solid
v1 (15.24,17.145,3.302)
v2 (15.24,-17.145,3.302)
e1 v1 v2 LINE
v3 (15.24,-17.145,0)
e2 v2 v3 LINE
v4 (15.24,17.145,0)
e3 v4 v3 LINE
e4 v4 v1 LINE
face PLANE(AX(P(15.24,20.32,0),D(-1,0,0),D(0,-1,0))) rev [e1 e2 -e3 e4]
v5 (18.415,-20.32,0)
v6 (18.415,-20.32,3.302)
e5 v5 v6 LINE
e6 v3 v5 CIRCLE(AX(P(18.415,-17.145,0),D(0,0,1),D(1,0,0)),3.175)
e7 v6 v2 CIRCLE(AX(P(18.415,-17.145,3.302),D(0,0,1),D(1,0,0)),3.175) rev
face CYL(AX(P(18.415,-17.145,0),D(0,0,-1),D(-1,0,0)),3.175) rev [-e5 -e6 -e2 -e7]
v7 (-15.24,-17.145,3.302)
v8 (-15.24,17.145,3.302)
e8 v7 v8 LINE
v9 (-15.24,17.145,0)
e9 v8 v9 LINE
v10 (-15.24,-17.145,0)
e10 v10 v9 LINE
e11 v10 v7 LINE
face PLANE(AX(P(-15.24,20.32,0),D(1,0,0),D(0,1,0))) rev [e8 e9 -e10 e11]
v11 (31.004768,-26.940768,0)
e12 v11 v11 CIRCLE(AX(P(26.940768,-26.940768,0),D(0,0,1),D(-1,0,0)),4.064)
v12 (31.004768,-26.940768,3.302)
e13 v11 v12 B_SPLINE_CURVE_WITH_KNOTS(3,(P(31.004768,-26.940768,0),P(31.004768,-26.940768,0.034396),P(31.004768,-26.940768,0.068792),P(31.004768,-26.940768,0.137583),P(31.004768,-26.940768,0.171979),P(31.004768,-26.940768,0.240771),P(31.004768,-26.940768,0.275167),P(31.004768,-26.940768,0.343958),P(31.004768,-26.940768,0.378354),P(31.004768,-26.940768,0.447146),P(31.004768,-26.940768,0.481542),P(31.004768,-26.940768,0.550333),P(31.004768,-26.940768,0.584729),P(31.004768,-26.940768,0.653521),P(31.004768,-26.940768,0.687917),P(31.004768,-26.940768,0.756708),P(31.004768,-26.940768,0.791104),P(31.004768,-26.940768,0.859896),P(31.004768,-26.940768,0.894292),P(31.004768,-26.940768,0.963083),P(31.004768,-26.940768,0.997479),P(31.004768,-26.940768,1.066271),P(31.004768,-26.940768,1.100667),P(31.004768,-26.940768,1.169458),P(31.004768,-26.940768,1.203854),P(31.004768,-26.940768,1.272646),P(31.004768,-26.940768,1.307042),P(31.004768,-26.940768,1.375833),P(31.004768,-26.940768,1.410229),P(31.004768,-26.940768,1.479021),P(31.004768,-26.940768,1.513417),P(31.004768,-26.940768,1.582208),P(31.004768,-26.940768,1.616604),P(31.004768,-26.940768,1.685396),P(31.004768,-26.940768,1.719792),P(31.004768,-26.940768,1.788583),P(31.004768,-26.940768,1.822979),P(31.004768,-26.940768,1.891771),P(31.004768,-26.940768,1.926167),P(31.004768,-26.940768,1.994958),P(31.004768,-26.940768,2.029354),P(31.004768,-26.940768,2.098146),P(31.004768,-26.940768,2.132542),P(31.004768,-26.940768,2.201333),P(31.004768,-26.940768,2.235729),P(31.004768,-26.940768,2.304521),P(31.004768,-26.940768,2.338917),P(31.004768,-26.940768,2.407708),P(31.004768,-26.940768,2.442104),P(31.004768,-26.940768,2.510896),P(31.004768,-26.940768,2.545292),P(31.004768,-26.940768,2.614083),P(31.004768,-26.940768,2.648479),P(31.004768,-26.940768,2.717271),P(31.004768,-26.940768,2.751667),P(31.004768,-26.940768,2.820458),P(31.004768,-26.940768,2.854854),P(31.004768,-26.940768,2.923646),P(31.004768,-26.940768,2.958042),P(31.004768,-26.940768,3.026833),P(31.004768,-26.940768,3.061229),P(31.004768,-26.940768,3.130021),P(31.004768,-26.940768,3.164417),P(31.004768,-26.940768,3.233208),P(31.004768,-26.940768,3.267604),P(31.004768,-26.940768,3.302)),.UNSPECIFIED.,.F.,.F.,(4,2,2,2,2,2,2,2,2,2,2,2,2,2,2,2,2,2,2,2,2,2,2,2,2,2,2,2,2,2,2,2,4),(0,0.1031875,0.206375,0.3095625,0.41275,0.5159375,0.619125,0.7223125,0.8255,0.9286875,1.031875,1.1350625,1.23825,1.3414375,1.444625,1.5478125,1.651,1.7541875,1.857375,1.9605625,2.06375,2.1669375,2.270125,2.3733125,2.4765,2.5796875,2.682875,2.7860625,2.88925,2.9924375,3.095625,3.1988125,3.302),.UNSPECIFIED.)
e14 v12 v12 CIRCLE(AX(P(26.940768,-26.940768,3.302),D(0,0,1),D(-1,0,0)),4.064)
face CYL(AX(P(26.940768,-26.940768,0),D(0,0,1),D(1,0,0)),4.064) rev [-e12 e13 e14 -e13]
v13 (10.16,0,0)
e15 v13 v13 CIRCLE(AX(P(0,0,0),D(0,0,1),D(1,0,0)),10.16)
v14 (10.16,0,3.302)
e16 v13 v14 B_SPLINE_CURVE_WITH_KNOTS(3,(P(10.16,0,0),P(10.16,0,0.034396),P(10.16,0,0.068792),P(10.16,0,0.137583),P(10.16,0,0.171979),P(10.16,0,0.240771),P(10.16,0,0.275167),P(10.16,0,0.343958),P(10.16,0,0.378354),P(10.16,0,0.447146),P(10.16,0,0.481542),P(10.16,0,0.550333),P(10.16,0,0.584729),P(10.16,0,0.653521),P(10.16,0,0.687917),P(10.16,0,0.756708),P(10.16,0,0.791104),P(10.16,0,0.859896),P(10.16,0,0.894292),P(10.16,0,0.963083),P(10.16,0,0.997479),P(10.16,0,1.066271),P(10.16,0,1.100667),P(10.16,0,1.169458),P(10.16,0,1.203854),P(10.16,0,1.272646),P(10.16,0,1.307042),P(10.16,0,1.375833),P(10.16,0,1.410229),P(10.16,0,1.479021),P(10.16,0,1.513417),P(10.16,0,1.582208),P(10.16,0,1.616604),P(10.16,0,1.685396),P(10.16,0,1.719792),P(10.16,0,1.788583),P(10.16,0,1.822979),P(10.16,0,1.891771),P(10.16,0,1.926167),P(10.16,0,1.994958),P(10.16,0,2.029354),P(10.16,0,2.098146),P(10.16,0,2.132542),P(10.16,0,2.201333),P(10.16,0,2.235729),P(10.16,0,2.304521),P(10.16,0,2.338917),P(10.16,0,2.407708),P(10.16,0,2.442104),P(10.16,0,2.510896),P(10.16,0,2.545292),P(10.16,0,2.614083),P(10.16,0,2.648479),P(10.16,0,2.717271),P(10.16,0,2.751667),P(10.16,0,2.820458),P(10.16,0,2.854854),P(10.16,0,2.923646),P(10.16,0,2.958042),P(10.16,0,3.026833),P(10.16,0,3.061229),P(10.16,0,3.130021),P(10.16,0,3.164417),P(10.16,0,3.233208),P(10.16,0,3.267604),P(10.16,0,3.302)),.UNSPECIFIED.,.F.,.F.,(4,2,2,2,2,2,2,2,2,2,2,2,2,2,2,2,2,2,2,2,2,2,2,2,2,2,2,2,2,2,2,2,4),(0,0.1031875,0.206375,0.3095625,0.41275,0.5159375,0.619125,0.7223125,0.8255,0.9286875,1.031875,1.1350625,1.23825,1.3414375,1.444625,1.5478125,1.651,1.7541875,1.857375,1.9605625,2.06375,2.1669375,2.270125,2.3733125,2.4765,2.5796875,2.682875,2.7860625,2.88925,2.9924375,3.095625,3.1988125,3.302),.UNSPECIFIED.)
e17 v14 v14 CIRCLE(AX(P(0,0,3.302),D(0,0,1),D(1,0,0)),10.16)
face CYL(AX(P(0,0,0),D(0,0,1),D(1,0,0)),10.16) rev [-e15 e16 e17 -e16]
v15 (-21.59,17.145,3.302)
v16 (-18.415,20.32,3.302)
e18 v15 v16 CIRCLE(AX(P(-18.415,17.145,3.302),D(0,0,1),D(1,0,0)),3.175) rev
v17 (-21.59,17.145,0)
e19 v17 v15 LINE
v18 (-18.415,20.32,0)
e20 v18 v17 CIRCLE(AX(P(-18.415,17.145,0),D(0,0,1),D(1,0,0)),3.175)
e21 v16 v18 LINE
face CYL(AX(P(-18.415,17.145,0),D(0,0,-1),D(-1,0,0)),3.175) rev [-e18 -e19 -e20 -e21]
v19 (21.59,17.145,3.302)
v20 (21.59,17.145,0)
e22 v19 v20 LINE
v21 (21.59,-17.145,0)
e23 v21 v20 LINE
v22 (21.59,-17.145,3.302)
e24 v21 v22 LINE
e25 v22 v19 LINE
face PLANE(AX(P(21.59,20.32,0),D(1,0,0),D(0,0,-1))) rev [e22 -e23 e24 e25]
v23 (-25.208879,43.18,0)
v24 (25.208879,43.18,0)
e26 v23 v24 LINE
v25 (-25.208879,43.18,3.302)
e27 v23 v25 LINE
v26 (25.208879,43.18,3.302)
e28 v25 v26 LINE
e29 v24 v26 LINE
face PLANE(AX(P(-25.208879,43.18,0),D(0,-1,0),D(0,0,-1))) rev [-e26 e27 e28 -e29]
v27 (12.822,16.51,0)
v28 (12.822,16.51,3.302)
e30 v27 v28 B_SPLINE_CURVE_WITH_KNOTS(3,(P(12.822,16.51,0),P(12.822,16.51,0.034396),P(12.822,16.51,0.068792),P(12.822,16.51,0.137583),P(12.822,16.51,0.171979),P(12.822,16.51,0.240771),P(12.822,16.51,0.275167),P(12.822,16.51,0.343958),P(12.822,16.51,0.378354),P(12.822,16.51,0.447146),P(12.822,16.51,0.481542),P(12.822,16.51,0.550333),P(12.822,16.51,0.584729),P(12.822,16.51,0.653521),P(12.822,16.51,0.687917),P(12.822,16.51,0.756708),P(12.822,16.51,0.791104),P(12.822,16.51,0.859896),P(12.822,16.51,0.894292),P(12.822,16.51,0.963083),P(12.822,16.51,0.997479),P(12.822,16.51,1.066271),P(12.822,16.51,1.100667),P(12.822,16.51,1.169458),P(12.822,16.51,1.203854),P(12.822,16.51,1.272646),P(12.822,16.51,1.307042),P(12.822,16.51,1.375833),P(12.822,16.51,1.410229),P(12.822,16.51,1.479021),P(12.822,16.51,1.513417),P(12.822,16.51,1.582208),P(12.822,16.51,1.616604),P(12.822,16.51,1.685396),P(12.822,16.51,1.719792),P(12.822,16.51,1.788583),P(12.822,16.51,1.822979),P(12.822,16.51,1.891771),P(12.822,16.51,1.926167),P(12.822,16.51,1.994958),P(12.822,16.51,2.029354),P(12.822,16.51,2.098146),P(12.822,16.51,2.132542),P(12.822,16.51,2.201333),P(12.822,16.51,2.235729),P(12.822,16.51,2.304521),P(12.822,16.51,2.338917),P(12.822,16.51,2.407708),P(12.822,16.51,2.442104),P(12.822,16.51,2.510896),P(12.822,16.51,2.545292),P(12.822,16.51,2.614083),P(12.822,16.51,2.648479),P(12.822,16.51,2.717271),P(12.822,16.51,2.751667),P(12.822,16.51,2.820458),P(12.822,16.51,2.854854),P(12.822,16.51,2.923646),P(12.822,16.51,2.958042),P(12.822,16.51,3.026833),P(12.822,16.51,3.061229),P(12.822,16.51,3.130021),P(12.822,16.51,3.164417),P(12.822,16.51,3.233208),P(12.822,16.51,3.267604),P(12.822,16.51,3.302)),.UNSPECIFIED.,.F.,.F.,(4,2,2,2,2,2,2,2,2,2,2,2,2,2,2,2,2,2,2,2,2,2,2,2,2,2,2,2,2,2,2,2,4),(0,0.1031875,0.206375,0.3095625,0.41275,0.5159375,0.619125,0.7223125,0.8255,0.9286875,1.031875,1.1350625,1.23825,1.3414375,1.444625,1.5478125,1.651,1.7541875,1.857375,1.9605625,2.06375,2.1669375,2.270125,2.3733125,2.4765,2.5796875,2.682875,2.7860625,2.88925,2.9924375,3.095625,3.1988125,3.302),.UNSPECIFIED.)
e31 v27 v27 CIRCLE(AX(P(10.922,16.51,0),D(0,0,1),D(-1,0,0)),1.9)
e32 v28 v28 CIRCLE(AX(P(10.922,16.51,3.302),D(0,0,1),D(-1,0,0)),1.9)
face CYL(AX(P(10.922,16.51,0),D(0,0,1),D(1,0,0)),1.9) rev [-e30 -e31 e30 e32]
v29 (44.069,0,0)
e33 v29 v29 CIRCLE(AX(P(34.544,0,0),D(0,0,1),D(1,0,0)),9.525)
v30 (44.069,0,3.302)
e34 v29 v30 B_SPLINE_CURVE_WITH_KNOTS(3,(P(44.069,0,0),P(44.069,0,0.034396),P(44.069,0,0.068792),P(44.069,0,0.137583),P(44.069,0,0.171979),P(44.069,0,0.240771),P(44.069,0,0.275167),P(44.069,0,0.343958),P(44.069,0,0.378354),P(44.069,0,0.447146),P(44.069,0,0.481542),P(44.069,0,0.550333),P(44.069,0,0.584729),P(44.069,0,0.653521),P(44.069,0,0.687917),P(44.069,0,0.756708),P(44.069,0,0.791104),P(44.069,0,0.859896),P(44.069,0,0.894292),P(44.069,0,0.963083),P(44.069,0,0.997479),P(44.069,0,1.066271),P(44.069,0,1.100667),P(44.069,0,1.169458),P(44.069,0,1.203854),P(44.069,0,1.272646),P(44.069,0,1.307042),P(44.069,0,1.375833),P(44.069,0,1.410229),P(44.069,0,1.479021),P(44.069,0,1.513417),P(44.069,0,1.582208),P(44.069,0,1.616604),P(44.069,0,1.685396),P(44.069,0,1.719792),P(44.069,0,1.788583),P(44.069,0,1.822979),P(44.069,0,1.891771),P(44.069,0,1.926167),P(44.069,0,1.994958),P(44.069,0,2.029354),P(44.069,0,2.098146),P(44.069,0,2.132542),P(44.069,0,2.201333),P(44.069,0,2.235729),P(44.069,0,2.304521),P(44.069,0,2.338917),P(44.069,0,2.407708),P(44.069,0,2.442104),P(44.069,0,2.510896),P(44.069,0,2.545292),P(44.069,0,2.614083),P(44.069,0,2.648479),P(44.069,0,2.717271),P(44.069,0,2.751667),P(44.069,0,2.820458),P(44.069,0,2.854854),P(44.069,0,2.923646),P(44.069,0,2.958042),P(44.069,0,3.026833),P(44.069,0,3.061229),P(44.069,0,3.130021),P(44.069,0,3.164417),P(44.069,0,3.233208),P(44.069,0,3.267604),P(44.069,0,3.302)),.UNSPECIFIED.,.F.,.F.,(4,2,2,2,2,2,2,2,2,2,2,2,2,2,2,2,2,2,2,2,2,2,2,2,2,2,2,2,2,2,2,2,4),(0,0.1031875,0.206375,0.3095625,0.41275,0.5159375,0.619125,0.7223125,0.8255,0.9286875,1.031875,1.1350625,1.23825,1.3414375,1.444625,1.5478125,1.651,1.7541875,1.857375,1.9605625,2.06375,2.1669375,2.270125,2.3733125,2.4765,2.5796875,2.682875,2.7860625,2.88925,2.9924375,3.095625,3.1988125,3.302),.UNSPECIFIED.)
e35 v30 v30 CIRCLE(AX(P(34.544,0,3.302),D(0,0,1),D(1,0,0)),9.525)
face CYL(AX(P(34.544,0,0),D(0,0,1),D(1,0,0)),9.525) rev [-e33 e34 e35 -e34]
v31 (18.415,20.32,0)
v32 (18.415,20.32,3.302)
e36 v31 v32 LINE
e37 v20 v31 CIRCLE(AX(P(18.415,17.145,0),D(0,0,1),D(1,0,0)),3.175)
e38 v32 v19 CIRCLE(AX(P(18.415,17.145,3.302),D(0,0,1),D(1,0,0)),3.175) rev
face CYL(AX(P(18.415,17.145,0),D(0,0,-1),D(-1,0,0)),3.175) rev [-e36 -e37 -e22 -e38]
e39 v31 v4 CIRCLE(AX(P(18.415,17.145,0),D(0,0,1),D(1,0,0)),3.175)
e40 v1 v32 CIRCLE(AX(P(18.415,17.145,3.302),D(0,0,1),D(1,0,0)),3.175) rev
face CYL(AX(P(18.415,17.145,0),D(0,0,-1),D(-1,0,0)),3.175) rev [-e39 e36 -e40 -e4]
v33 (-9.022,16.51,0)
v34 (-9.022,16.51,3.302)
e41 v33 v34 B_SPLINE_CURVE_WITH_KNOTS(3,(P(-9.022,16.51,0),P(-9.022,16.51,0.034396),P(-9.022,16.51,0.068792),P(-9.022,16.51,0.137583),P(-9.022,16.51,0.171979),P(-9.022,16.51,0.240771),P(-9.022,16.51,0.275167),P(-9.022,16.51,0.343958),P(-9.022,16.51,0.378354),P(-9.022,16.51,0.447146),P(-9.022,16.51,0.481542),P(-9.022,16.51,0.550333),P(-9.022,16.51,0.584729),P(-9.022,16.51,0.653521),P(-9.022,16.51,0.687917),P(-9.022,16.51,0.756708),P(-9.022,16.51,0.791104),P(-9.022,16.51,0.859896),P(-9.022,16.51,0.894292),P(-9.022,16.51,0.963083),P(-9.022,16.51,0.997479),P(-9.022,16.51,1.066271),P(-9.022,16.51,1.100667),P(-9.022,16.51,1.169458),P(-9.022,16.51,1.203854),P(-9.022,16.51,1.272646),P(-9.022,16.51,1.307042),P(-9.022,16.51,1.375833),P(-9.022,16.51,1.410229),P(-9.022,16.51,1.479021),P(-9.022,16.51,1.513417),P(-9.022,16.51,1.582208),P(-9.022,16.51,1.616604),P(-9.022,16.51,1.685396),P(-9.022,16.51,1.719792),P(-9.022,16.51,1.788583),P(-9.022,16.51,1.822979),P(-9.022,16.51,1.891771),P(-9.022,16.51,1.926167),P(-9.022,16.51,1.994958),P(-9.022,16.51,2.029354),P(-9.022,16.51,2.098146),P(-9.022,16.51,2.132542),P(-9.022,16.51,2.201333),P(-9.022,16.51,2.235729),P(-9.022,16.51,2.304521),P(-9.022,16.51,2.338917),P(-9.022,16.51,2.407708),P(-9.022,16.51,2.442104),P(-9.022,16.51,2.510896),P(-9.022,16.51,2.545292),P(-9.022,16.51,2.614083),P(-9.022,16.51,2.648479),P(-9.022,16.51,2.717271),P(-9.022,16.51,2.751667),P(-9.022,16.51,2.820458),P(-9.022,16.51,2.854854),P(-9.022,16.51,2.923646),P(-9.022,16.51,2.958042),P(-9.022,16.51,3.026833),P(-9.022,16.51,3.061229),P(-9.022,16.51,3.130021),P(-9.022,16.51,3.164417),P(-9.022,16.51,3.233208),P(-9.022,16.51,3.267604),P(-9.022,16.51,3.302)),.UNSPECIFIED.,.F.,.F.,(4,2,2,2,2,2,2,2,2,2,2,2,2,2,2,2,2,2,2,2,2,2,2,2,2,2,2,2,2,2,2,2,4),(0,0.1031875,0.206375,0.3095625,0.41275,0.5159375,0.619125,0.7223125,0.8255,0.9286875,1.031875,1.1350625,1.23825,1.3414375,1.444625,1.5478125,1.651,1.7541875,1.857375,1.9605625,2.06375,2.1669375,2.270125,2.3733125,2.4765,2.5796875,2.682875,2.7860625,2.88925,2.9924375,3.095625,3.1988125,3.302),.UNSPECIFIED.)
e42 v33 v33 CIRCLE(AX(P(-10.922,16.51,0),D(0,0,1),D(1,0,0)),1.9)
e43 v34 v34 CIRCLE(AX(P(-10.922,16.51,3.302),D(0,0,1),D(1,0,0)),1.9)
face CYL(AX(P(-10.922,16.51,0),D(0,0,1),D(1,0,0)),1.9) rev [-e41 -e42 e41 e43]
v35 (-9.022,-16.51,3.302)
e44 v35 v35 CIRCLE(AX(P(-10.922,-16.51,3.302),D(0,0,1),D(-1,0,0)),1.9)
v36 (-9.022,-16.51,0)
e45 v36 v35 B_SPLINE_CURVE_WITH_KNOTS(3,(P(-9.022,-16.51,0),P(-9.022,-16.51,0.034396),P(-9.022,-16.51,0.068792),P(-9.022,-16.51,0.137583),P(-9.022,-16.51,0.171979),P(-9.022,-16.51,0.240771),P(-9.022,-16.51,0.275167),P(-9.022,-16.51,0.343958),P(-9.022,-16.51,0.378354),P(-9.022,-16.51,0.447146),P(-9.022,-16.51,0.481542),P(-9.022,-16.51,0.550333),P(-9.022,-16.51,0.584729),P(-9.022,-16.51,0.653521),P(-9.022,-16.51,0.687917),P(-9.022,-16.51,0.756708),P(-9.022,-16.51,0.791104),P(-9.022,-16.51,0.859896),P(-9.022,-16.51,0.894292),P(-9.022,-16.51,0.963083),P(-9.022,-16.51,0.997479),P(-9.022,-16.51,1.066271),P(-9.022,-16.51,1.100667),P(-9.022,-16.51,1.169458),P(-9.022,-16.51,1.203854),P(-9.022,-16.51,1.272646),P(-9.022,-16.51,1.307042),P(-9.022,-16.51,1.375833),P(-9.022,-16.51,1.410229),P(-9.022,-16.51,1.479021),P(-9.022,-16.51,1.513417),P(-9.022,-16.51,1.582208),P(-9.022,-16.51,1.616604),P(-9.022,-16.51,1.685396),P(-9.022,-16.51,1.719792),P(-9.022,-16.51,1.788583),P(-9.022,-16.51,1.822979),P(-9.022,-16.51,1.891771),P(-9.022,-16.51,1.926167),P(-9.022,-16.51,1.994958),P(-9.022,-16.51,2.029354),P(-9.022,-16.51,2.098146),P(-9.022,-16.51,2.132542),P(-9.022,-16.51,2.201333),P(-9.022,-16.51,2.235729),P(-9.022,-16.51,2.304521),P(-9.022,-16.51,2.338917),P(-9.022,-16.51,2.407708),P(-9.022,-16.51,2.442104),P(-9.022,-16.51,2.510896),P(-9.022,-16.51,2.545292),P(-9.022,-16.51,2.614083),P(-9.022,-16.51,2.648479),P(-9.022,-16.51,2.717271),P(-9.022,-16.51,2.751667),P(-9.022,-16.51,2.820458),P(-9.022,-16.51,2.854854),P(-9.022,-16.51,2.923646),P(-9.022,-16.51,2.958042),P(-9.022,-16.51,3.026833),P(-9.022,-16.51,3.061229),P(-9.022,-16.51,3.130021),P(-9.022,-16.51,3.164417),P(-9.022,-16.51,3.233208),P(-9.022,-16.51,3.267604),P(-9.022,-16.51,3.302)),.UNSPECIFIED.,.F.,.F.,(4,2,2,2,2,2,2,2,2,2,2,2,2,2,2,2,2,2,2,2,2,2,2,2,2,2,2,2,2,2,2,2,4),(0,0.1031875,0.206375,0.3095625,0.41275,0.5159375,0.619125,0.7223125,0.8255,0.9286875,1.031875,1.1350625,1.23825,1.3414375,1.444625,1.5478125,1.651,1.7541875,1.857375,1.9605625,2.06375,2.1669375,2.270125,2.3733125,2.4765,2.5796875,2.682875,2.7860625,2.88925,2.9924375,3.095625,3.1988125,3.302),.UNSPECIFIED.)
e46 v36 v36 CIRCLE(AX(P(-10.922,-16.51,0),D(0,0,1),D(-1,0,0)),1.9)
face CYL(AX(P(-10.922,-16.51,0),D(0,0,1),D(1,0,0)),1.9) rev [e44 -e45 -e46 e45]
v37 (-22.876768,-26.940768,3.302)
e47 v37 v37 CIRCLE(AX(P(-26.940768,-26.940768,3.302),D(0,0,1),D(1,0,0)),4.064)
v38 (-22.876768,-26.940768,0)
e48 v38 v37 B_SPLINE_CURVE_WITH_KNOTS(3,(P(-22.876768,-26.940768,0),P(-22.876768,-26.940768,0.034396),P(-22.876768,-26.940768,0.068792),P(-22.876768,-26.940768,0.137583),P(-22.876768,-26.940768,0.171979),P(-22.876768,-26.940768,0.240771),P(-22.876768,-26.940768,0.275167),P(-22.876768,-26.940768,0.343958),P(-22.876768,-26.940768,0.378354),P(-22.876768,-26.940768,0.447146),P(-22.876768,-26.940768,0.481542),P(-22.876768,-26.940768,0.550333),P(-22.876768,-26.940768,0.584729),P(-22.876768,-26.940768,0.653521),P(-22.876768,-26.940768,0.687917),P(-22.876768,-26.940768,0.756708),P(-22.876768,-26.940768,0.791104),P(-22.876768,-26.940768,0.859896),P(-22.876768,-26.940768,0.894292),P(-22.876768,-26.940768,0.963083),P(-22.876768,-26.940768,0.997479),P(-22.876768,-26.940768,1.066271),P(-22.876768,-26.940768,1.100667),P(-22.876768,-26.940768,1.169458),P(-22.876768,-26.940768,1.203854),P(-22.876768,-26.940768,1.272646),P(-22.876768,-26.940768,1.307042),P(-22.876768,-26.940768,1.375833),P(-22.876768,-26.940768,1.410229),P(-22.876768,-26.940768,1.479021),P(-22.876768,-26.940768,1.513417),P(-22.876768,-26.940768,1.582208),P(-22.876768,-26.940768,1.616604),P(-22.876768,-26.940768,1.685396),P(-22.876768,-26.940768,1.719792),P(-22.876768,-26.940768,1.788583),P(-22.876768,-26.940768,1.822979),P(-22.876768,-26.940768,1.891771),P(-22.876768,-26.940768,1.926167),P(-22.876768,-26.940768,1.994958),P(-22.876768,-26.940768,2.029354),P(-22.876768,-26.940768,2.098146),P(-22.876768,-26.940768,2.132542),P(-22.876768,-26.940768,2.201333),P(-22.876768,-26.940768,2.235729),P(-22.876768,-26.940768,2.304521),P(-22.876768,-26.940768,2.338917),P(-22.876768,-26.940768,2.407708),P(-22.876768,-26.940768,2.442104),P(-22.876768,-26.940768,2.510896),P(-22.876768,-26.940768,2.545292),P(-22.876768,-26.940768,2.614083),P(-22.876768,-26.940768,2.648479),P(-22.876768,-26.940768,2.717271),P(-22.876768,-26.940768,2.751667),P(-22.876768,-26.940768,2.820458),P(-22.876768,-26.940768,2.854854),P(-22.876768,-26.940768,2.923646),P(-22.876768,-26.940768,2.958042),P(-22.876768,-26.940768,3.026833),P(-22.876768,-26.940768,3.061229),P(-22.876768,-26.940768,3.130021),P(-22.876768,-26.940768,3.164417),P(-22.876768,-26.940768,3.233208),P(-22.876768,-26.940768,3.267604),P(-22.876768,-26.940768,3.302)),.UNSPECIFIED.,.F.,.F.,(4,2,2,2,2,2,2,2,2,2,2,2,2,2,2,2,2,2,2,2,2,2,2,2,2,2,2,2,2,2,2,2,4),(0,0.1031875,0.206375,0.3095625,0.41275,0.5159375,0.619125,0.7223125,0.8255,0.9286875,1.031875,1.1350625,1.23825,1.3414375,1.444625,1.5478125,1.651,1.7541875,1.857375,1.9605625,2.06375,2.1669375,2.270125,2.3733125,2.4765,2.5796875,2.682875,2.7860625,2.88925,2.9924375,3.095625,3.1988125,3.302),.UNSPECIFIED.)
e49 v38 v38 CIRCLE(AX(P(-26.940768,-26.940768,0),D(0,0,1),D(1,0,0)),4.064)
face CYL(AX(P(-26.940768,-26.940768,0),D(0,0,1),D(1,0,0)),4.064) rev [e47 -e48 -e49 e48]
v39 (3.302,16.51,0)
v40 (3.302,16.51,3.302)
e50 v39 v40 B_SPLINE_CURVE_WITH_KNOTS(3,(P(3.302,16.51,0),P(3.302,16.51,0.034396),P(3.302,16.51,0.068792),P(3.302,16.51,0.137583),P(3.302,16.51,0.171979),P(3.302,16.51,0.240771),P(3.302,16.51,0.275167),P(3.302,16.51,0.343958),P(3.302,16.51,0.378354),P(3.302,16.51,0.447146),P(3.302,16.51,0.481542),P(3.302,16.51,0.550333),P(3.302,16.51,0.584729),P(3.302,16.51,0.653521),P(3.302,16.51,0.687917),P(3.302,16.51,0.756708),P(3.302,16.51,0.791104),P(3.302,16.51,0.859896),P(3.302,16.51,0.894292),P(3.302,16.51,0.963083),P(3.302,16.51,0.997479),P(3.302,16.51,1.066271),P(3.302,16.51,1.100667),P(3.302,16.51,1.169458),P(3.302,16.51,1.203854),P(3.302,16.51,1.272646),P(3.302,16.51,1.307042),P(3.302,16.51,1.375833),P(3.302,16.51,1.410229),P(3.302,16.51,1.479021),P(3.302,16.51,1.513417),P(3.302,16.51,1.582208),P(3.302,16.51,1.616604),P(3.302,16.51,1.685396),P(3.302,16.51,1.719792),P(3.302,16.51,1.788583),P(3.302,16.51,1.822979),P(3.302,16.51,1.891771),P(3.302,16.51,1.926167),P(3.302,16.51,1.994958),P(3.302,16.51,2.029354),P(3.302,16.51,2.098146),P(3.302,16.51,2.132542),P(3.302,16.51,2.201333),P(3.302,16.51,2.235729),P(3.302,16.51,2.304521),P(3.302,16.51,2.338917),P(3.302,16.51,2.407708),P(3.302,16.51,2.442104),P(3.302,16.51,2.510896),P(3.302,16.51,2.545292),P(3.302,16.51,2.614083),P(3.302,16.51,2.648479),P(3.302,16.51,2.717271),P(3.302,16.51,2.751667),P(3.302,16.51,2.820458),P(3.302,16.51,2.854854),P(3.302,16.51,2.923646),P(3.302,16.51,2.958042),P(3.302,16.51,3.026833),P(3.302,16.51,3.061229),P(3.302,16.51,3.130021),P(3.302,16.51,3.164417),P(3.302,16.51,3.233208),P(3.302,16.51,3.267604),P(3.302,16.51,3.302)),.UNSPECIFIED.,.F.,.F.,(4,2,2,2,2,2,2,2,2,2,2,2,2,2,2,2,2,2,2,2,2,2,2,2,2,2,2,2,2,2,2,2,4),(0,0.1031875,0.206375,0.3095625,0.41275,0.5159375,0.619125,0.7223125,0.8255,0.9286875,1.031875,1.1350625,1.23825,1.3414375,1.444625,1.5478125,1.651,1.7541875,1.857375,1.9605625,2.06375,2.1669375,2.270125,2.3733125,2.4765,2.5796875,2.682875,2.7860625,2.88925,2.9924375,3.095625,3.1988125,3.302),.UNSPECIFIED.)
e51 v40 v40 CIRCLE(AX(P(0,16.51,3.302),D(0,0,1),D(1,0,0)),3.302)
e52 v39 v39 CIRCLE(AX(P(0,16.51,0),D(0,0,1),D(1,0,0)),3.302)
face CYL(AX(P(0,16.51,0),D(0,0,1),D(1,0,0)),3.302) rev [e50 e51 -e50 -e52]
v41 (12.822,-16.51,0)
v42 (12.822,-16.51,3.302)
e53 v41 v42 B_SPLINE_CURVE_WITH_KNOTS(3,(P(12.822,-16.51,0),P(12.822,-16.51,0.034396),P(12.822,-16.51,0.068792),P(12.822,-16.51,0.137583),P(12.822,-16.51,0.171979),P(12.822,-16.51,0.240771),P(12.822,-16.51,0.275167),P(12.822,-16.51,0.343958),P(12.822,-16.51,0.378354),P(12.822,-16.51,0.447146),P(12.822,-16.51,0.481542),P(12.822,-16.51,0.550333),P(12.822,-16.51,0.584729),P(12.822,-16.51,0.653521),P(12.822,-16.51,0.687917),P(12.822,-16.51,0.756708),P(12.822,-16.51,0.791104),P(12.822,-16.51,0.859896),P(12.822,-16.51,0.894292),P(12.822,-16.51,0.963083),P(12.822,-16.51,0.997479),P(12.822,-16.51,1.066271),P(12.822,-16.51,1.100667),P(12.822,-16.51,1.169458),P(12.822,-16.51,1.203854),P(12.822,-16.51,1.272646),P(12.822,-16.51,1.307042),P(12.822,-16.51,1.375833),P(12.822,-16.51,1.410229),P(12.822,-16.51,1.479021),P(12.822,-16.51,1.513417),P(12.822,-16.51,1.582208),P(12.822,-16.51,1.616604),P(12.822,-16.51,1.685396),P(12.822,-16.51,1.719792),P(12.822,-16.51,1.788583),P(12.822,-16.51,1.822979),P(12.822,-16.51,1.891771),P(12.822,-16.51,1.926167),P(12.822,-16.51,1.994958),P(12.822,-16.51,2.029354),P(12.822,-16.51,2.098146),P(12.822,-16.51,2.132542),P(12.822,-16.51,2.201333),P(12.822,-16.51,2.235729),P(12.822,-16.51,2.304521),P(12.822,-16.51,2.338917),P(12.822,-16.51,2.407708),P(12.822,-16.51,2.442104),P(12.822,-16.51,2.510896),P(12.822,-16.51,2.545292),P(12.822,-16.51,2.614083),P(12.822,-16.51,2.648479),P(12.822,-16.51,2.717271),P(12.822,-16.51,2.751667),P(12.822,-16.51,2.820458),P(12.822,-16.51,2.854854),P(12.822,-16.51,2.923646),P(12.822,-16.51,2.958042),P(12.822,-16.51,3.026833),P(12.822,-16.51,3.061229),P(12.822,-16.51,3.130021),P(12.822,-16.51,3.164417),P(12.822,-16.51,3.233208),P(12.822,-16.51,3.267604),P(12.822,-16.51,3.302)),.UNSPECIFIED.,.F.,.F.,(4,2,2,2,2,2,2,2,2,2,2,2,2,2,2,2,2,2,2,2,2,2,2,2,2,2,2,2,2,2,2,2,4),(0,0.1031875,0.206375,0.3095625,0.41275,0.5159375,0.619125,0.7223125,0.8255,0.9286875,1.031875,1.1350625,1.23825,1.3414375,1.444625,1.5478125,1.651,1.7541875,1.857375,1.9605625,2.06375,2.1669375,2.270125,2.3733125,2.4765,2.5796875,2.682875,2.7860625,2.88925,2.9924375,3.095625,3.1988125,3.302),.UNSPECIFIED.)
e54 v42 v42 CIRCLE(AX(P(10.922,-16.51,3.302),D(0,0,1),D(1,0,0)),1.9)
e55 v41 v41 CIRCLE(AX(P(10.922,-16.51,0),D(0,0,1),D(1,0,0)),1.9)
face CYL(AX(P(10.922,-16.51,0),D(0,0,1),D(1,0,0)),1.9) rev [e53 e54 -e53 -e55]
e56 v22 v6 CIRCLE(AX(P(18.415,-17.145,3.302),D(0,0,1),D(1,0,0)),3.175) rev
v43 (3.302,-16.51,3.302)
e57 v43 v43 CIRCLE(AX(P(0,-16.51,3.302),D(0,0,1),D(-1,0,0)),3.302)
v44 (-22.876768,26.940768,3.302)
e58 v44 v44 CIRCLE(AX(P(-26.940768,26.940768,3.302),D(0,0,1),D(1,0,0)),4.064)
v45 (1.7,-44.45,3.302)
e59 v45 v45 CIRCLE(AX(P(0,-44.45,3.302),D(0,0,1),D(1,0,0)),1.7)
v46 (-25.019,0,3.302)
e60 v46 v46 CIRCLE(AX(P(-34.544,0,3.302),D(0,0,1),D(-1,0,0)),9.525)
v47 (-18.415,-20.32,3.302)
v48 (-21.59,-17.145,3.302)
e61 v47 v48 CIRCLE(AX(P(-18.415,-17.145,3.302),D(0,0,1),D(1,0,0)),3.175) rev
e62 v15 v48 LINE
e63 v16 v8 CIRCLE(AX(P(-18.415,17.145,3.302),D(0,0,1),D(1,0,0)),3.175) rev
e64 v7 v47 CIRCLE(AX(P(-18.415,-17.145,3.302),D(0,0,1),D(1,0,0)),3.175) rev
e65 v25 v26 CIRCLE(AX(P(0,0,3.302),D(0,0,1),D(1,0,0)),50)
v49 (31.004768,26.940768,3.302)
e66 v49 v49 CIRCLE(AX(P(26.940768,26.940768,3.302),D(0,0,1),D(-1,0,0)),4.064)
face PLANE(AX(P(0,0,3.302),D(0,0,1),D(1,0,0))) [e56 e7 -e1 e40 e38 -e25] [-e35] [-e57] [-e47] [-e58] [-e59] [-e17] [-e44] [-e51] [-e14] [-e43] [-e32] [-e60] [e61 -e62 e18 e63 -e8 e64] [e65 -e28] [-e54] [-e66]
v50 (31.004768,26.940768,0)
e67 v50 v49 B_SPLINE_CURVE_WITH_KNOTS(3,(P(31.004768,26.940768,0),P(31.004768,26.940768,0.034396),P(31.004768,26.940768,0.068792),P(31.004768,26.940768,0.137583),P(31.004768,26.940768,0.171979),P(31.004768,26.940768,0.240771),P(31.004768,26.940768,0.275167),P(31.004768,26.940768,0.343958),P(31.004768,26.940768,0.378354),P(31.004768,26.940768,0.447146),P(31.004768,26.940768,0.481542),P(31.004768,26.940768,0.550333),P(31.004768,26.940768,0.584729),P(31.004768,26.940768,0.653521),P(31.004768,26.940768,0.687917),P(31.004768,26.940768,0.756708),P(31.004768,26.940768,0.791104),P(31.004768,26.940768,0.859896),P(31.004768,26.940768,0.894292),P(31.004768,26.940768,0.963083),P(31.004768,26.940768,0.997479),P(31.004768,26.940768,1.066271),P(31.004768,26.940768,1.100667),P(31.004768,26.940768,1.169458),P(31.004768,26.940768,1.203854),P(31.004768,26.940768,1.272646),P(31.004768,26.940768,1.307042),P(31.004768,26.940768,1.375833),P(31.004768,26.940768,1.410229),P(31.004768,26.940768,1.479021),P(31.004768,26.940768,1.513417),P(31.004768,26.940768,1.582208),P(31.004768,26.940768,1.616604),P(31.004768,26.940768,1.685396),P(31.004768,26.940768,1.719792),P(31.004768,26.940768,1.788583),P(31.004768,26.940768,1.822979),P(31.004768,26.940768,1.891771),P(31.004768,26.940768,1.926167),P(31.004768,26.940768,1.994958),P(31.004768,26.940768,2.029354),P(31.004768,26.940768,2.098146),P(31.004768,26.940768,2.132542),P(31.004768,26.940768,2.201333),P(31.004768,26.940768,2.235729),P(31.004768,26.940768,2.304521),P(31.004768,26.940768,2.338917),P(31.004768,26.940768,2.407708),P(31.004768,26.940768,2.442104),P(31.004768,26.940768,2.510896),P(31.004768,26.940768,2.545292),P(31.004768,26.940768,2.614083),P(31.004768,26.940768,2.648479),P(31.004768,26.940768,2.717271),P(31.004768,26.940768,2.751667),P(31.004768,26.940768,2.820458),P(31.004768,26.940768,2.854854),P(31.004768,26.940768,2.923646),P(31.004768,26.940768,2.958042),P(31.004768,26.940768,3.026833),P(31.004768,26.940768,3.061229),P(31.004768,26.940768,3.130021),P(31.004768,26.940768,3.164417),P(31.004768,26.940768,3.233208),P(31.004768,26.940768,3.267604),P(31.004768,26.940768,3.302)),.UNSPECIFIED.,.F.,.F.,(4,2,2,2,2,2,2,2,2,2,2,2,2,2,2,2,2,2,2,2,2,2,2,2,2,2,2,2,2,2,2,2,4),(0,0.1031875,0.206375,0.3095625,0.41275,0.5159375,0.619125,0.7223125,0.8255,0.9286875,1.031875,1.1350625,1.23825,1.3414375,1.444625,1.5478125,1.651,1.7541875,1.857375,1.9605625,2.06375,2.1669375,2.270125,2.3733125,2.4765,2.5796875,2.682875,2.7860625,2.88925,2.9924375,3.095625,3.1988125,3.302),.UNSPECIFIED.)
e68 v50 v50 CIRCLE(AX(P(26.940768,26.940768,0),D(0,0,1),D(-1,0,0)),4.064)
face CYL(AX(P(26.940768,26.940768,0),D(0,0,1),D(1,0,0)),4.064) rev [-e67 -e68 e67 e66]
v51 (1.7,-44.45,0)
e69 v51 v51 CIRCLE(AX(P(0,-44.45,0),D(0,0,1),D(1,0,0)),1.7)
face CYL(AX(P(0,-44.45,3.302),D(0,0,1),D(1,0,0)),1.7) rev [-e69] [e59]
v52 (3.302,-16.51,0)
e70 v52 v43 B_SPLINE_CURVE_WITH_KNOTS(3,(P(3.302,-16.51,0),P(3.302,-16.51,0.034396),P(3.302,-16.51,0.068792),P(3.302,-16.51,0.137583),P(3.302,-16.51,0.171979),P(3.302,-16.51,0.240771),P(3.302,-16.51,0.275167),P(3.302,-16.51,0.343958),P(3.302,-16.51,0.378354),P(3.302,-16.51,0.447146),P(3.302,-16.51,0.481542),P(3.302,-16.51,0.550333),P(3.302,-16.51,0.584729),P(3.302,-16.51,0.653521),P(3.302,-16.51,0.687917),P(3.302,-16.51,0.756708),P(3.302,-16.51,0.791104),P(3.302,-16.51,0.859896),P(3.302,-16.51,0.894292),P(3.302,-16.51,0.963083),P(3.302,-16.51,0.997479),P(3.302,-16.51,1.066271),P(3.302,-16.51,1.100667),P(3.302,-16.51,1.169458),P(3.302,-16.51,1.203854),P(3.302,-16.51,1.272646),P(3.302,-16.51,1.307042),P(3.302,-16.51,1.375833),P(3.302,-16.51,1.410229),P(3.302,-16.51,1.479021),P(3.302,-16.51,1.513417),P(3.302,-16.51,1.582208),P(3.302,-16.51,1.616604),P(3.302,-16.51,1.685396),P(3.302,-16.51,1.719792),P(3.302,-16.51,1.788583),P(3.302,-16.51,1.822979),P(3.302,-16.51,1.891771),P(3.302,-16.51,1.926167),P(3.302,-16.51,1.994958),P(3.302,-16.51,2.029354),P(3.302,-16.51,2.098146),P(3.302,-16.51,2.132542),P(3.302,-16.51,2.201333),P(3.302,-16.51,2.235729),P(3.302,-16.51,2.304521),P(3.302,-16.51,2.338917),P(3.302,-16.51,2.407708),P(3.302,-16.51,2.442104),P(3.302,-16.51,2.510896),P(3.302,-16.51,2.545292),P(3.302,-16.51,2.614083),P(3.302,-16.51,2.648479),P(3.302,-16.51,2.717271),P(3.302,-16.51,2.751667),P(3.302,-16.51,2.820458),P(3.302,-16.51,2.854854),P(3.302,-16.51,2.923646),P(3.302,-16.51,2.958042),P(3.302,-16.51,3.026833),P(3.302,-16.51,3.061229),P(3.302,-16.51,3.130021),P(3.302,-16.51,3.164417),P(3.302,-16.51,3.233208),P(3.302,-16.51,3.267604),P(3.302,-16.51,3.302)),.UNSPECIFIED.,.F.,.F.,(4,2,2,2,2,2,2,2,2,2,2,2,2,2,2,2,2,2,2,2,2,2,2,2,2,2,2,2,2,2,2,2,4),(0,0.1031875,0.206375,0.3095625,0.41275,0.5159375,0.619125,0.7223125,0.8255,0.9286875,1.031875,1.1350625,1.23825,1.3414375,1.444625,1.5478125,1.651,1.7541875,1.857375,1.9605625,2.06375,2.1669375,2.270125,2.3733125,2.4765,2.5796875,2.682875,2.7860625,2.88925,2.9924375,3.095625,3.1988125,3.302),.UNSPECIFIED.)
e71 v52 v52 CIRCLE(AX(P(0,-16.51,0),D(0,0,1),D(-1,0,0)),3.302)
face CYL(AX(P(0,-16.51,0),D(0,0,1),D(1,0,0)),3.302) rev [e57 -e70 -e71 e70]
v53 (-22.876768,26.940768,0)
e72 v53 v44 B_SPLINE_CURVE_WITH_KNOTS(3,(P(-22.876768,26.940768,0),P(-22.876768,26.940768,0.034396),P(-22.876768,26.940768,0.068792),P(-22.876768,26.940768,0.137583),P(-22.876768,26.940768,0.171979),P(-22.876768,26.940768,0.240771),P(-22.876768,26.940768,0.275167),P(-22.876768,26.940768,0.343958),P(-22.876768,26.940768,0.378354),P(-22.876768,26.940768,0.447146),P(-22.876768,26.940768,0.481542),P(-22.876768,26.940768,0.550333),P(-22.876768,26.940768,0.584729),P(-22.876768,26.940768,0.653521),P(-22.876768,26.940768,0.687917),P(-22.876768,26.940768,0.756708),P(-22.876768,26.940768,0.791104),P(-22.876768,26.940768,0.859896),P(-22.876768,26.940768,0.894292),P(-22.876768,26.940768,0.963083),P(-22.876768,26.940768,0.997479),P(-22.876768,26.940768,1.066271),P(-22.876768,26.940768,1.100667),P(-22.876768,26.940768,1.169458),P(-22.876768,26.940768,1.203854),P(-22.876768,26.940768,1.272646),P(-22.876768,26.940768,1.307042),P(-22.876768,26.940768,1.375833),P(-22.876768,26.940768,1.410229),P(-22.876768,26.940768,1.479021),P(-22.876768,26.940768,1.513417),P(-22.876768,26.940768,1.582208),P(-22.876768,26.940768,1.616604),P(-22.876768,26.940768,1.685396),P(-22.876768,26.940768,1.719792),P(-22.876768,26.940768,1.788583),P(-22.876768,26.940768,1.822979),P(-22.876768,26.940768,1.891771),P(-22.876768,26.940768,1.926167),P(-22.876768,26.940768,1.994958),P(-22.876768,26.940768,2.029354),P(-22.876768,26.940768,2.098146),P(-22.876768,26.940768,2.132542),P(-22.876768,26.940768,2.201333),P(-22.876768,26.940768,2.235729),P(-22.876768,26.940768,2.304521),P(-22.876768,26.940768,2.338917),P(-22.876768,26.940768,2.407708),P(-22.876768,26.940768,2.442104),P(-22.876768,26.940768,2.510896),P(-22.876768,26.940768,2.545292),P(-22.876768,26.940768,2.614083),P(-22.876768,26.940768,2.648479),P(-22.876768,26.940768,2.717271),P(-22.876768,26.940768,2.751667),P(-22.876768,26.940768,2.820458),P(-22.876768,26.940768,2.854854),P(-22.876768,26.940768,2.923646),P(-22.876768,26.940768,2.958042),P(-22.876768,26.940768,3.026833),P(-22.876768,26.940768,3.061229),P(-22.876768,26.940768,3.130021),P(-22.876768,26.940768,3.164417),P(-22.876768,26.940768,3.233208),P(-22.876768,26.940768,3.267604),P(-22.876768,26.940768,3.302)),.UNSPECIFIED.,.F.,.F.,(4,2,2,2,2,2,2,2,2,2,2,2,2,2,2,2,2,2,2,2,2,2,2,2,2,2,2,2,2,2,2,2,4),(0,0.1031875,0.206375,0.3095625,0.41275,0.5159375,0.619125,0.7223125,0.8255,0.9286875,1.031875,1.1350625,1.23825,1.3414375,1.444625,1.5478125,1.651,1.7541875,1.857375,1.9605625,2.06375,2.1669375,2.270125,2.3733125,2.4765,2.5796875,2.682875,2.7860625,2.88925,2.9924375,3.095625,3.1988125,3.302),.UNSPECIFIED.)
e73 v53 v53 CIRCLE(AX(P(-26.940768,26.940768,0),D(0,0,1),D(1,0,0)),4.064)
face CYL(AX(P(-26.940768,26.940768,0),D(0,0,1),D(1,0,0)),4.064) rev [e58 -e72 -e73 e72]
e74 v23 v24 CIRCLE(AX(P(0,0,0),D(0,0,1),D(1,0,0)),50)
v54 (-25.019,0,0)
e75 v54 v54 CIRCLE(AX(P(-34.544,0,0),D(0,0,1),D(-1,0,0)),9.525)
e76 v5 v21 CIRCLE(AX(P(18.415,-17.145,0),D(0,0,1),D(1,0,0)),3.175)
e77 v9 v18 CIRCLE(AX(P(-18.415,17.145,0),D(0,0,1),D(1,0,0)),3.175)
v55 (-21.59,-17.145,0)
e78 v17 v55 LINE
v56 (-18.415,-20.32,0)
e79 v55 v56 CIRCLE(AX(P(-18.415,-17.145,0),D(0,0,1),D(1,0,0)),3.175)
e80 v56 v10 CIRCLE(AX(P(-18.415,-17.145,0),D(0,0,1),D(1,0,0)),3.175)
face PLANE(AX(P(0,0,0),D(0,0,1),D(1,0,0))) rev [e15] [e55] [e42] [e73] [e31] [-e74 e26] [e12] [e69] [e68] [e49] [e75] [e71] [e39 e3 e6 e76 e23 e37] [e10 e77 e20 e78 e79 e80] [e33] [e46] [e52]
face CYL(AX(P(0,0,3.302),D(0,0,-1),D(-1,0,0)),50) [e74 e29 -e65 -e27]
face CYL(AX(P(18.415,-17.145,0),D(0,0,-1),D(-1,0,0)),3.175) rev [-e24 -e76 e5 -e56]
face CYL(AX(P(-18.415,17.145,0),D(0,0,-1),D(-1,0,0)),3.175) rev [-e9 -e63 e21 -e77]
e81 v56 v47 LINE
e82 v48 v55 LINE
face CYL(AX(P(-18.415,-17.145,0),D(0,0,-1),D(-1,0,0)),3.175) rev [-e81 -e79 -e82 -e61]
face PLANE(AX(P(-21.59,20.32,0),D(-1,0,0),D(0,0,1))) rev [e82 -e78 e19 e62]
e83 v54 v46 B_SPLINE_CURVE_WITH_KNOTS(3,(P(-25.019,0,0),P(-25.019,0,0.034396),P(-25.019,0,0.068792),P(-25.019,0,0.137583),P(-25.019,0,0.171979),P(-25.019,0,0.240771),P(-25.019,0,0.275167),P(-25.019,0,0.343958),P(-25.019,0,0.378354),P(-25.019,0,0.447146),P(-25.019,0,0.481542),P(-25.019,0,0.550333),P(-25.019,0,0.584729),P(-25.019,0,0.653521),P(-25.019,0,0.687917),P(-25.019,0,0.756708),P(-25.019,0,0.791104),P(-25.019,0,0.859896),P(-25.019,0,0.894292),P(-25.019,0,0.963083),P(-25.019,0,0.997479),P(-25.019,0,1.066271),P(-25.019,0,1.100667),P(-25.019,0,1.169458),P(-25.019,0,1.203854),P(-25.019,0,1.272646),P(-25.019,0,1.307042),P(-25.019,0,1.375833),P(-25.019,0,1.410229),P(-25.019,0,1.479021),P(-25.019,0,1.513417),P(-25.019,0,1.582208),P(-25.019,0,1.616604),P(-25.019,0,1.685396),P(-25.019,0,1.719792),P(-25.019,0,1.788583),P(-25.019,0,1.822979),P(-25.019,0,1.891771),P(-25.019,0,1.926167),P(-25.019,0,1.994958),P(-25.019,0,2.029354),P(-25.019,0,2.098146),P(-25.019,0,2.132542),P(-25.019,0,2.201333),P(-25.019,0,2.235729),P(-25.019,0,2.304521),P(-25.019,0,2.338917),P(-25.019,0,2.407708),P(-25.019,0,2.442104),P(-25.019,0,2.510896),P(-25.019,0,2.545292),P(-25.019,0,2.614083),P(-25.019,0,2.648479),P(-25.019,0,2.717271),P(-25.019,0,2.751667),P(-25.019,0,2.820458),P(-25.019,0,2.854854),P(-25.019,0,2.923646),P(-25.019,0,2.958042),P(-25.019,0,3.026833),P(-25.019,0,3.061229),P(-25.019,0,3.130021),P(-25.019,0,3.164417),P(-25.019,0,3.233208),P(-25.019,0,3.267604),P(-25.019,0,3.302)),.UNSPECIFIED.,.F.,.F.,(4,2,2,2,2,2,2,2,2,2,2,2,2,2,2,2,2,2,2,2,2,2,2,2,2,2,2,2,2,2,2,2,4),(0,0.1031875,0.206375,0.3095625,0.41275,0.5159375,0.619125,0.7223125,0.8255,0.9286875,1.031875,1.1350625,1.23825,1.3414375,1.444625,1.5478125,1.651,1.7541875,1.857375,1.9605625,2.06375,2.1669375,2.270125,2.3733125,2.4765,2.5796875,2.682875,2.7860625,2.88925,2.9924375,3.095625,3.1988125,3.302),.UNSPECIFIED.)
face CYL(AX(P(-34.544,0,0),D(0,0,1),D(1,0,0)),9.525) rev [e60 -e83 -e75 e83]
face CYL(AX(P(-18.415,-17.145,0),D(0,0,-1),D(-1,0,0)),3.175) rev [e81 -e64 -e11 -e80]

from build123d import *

# Parameters (mm, degrees)
SKETCH_1_R               = 50
EXTRUDE_1_DEPTH          = 3.302
SKETCH_2_R               = 4.064
CUT_EXTRUDE_1_DEPTH      = 71.787733429
SKETCH_3_W               = 50.417758776
SKETCH_3_H               = 15.226983209
CUT_EXTRUDE_2_DEPTH      = 71.787733429
SKETCH_4_R               = 10.16
CUT_EXTRUDE_3_DEPTH      = 71.787733429
SKETCH_8_R               = 9.525
SKETCH_8_W               = 6.35
SKETCH_8_H               = 40.64
CUT_EXTRUDE_4_DEPTH      = 71.787733429
SKETCH_9_R               = 1.9
SKETCH_9_R_2             = 3.302
CUT_EXTRUDE_5_DEPTH      = 71.787733429
FILLET1_R                = 3.175
M3_CLEARANCE_HOLE1_D     = 3.4
M3_CLEARANCE_HOLE1_DEPTH = 25.4
M3_CLEARANCE_HOLE1_TIP   = 1.021463052


with BuildPart() as part:
    # 草图1 → 凸台-拉伸1 (new body)
    with BuildSketch(Plane.XY):
        with Locations(Location((0, 0, 0), (0, 0, 180))):
            Circle(SKETCH_1_R)
    extrude(amount=EXTRUDE_1_DEPTH)

    # 草图2 → 切除-拉伸1 (cut, through all)
    with BuildSketch(Plane.XY.offset(3.302)):
        with Locations((-26.940768363, 26.940768363)):
            Circle(SKETCH_2_R)
        with Locations((-26.940768363, -26.940768363)):
            Circle(SKETCH_2_R)
        with Locations((26.940768363, -26.940768363)):
            Circle(SKETCH_2_R)
        with Locations((26.940768363, 26.940768363)):
            Circle(SKETCH_2_R)
    extrude(amount=-CUT_EXTRUDE_1_DEPTH, mode=Mode.SUBTRACT)

    # 草图3 → 切除-拉伸2 (cut, through all)
    with BuildSketch(Plane.XY.offset(3.302)):
        with Locations((0, 50.793491605)):
            Rectangle(SKETCH_3_W, SKETCH_3_H)
    extrude(amount=-CUT_EXTRUDE_2_DEPTH, mode=Mode.SUBTRACT)

    # 草图4 → 切除-拉伸3 (cut, through all)
    with BuildSketch(Plane.XY.offset(3.302)):
        Circle(SKETCH_4_R)
    extrude(amount=-CUT_EXTRUDE_3_DEPTH, mode=Mode.SUBTRACT)

    # 草图8 → 切除-拉伸4 (cut, through all)
    with BuildSketch(Plane.XY.offset(3.302)):
        with Locations((34.544, 0)):
            Circle(SKETCH_8_R)
        with Locations((-34.544, 0)):
            Circle(SKETCH_8_R)
        with Locations((18.415, 0)):
            Rectangle(SKETCH_8_W, SKETCH_8_H)
        with Locations((-18.415, 0)):
            Rectangle(SKETCH_8_W, SKETCH_8_H)
    extrude(amount=-CUT_EXTRUDE_4_DEPTH, mode=Mode.SUBTRACT)

    # 草图9 → 切除-拉伸5 (cut, through all)
    with BuildSketch(Plane.XY.offset(3.302)):
        with Locations((-10.922, 16.51)):
            Circle(SKETCH_9_R)
        with Locations((10.922, 16.51)):
            Circle(SKETCH_9_R)
        with Locations((-10.922, -16.51)):
            Circle(SKETCH_9_R)
        with Locations((10.922, -16.51)):
            Circle(SKETCH_9_R)
        with Locations((0, 16.51)):
            Circle(SKETCH_9_R_2)
        with Locations((0, -16.51)):
            Circle(SKETCH_9_R_2)
    extrude(amount=-CUT_EXTRUDE_5_DEPTH, mode=Mode.SUBTRACT)

    # Fillet1
    fillet1_edges = [part.edges().sort_by_distance(p)[0] for p in [
        (15.24, 20.32, 1.651),
        (21.59, 20.32, 1.651),
        (21.59, -20.32, 1.651),
        (15.24, -20.32, 1.651),
        (-15.24, -20.32, 1.651),
        (-21.59, -20.32, 1.651),
        (-15.24, 20.32, 1.651),
        (-21.59, 20.32, 1.651),
    ]]
    fillet(fillet1_edges, radius=FILLET1_R - 0.0001)  # a hair under: the kernel refuses the full size

    # M3 Clearance Hole1
    with Locations(Plane.XY.offset(3.302)):
        with Locations((0, -44.45)):
            Hole(M3_CLEARANCE_HOLE1_D / 2, depth=M3_CLEARANCE_HOLE1_DEPTH)
            with Locations((0, 0, -(M3_CLEARANCE_HOLE1_DEPTH + M3_CLEARANCE_HOLE1_TIP / 2))):  # 118° drill point
                Cone(0, M3_CLEARANCE_HOLE1_D / 2, M3_CLEARANCE_HOLE1_TIP, mode=Mode.SUBTRACT)


solid = part.part
